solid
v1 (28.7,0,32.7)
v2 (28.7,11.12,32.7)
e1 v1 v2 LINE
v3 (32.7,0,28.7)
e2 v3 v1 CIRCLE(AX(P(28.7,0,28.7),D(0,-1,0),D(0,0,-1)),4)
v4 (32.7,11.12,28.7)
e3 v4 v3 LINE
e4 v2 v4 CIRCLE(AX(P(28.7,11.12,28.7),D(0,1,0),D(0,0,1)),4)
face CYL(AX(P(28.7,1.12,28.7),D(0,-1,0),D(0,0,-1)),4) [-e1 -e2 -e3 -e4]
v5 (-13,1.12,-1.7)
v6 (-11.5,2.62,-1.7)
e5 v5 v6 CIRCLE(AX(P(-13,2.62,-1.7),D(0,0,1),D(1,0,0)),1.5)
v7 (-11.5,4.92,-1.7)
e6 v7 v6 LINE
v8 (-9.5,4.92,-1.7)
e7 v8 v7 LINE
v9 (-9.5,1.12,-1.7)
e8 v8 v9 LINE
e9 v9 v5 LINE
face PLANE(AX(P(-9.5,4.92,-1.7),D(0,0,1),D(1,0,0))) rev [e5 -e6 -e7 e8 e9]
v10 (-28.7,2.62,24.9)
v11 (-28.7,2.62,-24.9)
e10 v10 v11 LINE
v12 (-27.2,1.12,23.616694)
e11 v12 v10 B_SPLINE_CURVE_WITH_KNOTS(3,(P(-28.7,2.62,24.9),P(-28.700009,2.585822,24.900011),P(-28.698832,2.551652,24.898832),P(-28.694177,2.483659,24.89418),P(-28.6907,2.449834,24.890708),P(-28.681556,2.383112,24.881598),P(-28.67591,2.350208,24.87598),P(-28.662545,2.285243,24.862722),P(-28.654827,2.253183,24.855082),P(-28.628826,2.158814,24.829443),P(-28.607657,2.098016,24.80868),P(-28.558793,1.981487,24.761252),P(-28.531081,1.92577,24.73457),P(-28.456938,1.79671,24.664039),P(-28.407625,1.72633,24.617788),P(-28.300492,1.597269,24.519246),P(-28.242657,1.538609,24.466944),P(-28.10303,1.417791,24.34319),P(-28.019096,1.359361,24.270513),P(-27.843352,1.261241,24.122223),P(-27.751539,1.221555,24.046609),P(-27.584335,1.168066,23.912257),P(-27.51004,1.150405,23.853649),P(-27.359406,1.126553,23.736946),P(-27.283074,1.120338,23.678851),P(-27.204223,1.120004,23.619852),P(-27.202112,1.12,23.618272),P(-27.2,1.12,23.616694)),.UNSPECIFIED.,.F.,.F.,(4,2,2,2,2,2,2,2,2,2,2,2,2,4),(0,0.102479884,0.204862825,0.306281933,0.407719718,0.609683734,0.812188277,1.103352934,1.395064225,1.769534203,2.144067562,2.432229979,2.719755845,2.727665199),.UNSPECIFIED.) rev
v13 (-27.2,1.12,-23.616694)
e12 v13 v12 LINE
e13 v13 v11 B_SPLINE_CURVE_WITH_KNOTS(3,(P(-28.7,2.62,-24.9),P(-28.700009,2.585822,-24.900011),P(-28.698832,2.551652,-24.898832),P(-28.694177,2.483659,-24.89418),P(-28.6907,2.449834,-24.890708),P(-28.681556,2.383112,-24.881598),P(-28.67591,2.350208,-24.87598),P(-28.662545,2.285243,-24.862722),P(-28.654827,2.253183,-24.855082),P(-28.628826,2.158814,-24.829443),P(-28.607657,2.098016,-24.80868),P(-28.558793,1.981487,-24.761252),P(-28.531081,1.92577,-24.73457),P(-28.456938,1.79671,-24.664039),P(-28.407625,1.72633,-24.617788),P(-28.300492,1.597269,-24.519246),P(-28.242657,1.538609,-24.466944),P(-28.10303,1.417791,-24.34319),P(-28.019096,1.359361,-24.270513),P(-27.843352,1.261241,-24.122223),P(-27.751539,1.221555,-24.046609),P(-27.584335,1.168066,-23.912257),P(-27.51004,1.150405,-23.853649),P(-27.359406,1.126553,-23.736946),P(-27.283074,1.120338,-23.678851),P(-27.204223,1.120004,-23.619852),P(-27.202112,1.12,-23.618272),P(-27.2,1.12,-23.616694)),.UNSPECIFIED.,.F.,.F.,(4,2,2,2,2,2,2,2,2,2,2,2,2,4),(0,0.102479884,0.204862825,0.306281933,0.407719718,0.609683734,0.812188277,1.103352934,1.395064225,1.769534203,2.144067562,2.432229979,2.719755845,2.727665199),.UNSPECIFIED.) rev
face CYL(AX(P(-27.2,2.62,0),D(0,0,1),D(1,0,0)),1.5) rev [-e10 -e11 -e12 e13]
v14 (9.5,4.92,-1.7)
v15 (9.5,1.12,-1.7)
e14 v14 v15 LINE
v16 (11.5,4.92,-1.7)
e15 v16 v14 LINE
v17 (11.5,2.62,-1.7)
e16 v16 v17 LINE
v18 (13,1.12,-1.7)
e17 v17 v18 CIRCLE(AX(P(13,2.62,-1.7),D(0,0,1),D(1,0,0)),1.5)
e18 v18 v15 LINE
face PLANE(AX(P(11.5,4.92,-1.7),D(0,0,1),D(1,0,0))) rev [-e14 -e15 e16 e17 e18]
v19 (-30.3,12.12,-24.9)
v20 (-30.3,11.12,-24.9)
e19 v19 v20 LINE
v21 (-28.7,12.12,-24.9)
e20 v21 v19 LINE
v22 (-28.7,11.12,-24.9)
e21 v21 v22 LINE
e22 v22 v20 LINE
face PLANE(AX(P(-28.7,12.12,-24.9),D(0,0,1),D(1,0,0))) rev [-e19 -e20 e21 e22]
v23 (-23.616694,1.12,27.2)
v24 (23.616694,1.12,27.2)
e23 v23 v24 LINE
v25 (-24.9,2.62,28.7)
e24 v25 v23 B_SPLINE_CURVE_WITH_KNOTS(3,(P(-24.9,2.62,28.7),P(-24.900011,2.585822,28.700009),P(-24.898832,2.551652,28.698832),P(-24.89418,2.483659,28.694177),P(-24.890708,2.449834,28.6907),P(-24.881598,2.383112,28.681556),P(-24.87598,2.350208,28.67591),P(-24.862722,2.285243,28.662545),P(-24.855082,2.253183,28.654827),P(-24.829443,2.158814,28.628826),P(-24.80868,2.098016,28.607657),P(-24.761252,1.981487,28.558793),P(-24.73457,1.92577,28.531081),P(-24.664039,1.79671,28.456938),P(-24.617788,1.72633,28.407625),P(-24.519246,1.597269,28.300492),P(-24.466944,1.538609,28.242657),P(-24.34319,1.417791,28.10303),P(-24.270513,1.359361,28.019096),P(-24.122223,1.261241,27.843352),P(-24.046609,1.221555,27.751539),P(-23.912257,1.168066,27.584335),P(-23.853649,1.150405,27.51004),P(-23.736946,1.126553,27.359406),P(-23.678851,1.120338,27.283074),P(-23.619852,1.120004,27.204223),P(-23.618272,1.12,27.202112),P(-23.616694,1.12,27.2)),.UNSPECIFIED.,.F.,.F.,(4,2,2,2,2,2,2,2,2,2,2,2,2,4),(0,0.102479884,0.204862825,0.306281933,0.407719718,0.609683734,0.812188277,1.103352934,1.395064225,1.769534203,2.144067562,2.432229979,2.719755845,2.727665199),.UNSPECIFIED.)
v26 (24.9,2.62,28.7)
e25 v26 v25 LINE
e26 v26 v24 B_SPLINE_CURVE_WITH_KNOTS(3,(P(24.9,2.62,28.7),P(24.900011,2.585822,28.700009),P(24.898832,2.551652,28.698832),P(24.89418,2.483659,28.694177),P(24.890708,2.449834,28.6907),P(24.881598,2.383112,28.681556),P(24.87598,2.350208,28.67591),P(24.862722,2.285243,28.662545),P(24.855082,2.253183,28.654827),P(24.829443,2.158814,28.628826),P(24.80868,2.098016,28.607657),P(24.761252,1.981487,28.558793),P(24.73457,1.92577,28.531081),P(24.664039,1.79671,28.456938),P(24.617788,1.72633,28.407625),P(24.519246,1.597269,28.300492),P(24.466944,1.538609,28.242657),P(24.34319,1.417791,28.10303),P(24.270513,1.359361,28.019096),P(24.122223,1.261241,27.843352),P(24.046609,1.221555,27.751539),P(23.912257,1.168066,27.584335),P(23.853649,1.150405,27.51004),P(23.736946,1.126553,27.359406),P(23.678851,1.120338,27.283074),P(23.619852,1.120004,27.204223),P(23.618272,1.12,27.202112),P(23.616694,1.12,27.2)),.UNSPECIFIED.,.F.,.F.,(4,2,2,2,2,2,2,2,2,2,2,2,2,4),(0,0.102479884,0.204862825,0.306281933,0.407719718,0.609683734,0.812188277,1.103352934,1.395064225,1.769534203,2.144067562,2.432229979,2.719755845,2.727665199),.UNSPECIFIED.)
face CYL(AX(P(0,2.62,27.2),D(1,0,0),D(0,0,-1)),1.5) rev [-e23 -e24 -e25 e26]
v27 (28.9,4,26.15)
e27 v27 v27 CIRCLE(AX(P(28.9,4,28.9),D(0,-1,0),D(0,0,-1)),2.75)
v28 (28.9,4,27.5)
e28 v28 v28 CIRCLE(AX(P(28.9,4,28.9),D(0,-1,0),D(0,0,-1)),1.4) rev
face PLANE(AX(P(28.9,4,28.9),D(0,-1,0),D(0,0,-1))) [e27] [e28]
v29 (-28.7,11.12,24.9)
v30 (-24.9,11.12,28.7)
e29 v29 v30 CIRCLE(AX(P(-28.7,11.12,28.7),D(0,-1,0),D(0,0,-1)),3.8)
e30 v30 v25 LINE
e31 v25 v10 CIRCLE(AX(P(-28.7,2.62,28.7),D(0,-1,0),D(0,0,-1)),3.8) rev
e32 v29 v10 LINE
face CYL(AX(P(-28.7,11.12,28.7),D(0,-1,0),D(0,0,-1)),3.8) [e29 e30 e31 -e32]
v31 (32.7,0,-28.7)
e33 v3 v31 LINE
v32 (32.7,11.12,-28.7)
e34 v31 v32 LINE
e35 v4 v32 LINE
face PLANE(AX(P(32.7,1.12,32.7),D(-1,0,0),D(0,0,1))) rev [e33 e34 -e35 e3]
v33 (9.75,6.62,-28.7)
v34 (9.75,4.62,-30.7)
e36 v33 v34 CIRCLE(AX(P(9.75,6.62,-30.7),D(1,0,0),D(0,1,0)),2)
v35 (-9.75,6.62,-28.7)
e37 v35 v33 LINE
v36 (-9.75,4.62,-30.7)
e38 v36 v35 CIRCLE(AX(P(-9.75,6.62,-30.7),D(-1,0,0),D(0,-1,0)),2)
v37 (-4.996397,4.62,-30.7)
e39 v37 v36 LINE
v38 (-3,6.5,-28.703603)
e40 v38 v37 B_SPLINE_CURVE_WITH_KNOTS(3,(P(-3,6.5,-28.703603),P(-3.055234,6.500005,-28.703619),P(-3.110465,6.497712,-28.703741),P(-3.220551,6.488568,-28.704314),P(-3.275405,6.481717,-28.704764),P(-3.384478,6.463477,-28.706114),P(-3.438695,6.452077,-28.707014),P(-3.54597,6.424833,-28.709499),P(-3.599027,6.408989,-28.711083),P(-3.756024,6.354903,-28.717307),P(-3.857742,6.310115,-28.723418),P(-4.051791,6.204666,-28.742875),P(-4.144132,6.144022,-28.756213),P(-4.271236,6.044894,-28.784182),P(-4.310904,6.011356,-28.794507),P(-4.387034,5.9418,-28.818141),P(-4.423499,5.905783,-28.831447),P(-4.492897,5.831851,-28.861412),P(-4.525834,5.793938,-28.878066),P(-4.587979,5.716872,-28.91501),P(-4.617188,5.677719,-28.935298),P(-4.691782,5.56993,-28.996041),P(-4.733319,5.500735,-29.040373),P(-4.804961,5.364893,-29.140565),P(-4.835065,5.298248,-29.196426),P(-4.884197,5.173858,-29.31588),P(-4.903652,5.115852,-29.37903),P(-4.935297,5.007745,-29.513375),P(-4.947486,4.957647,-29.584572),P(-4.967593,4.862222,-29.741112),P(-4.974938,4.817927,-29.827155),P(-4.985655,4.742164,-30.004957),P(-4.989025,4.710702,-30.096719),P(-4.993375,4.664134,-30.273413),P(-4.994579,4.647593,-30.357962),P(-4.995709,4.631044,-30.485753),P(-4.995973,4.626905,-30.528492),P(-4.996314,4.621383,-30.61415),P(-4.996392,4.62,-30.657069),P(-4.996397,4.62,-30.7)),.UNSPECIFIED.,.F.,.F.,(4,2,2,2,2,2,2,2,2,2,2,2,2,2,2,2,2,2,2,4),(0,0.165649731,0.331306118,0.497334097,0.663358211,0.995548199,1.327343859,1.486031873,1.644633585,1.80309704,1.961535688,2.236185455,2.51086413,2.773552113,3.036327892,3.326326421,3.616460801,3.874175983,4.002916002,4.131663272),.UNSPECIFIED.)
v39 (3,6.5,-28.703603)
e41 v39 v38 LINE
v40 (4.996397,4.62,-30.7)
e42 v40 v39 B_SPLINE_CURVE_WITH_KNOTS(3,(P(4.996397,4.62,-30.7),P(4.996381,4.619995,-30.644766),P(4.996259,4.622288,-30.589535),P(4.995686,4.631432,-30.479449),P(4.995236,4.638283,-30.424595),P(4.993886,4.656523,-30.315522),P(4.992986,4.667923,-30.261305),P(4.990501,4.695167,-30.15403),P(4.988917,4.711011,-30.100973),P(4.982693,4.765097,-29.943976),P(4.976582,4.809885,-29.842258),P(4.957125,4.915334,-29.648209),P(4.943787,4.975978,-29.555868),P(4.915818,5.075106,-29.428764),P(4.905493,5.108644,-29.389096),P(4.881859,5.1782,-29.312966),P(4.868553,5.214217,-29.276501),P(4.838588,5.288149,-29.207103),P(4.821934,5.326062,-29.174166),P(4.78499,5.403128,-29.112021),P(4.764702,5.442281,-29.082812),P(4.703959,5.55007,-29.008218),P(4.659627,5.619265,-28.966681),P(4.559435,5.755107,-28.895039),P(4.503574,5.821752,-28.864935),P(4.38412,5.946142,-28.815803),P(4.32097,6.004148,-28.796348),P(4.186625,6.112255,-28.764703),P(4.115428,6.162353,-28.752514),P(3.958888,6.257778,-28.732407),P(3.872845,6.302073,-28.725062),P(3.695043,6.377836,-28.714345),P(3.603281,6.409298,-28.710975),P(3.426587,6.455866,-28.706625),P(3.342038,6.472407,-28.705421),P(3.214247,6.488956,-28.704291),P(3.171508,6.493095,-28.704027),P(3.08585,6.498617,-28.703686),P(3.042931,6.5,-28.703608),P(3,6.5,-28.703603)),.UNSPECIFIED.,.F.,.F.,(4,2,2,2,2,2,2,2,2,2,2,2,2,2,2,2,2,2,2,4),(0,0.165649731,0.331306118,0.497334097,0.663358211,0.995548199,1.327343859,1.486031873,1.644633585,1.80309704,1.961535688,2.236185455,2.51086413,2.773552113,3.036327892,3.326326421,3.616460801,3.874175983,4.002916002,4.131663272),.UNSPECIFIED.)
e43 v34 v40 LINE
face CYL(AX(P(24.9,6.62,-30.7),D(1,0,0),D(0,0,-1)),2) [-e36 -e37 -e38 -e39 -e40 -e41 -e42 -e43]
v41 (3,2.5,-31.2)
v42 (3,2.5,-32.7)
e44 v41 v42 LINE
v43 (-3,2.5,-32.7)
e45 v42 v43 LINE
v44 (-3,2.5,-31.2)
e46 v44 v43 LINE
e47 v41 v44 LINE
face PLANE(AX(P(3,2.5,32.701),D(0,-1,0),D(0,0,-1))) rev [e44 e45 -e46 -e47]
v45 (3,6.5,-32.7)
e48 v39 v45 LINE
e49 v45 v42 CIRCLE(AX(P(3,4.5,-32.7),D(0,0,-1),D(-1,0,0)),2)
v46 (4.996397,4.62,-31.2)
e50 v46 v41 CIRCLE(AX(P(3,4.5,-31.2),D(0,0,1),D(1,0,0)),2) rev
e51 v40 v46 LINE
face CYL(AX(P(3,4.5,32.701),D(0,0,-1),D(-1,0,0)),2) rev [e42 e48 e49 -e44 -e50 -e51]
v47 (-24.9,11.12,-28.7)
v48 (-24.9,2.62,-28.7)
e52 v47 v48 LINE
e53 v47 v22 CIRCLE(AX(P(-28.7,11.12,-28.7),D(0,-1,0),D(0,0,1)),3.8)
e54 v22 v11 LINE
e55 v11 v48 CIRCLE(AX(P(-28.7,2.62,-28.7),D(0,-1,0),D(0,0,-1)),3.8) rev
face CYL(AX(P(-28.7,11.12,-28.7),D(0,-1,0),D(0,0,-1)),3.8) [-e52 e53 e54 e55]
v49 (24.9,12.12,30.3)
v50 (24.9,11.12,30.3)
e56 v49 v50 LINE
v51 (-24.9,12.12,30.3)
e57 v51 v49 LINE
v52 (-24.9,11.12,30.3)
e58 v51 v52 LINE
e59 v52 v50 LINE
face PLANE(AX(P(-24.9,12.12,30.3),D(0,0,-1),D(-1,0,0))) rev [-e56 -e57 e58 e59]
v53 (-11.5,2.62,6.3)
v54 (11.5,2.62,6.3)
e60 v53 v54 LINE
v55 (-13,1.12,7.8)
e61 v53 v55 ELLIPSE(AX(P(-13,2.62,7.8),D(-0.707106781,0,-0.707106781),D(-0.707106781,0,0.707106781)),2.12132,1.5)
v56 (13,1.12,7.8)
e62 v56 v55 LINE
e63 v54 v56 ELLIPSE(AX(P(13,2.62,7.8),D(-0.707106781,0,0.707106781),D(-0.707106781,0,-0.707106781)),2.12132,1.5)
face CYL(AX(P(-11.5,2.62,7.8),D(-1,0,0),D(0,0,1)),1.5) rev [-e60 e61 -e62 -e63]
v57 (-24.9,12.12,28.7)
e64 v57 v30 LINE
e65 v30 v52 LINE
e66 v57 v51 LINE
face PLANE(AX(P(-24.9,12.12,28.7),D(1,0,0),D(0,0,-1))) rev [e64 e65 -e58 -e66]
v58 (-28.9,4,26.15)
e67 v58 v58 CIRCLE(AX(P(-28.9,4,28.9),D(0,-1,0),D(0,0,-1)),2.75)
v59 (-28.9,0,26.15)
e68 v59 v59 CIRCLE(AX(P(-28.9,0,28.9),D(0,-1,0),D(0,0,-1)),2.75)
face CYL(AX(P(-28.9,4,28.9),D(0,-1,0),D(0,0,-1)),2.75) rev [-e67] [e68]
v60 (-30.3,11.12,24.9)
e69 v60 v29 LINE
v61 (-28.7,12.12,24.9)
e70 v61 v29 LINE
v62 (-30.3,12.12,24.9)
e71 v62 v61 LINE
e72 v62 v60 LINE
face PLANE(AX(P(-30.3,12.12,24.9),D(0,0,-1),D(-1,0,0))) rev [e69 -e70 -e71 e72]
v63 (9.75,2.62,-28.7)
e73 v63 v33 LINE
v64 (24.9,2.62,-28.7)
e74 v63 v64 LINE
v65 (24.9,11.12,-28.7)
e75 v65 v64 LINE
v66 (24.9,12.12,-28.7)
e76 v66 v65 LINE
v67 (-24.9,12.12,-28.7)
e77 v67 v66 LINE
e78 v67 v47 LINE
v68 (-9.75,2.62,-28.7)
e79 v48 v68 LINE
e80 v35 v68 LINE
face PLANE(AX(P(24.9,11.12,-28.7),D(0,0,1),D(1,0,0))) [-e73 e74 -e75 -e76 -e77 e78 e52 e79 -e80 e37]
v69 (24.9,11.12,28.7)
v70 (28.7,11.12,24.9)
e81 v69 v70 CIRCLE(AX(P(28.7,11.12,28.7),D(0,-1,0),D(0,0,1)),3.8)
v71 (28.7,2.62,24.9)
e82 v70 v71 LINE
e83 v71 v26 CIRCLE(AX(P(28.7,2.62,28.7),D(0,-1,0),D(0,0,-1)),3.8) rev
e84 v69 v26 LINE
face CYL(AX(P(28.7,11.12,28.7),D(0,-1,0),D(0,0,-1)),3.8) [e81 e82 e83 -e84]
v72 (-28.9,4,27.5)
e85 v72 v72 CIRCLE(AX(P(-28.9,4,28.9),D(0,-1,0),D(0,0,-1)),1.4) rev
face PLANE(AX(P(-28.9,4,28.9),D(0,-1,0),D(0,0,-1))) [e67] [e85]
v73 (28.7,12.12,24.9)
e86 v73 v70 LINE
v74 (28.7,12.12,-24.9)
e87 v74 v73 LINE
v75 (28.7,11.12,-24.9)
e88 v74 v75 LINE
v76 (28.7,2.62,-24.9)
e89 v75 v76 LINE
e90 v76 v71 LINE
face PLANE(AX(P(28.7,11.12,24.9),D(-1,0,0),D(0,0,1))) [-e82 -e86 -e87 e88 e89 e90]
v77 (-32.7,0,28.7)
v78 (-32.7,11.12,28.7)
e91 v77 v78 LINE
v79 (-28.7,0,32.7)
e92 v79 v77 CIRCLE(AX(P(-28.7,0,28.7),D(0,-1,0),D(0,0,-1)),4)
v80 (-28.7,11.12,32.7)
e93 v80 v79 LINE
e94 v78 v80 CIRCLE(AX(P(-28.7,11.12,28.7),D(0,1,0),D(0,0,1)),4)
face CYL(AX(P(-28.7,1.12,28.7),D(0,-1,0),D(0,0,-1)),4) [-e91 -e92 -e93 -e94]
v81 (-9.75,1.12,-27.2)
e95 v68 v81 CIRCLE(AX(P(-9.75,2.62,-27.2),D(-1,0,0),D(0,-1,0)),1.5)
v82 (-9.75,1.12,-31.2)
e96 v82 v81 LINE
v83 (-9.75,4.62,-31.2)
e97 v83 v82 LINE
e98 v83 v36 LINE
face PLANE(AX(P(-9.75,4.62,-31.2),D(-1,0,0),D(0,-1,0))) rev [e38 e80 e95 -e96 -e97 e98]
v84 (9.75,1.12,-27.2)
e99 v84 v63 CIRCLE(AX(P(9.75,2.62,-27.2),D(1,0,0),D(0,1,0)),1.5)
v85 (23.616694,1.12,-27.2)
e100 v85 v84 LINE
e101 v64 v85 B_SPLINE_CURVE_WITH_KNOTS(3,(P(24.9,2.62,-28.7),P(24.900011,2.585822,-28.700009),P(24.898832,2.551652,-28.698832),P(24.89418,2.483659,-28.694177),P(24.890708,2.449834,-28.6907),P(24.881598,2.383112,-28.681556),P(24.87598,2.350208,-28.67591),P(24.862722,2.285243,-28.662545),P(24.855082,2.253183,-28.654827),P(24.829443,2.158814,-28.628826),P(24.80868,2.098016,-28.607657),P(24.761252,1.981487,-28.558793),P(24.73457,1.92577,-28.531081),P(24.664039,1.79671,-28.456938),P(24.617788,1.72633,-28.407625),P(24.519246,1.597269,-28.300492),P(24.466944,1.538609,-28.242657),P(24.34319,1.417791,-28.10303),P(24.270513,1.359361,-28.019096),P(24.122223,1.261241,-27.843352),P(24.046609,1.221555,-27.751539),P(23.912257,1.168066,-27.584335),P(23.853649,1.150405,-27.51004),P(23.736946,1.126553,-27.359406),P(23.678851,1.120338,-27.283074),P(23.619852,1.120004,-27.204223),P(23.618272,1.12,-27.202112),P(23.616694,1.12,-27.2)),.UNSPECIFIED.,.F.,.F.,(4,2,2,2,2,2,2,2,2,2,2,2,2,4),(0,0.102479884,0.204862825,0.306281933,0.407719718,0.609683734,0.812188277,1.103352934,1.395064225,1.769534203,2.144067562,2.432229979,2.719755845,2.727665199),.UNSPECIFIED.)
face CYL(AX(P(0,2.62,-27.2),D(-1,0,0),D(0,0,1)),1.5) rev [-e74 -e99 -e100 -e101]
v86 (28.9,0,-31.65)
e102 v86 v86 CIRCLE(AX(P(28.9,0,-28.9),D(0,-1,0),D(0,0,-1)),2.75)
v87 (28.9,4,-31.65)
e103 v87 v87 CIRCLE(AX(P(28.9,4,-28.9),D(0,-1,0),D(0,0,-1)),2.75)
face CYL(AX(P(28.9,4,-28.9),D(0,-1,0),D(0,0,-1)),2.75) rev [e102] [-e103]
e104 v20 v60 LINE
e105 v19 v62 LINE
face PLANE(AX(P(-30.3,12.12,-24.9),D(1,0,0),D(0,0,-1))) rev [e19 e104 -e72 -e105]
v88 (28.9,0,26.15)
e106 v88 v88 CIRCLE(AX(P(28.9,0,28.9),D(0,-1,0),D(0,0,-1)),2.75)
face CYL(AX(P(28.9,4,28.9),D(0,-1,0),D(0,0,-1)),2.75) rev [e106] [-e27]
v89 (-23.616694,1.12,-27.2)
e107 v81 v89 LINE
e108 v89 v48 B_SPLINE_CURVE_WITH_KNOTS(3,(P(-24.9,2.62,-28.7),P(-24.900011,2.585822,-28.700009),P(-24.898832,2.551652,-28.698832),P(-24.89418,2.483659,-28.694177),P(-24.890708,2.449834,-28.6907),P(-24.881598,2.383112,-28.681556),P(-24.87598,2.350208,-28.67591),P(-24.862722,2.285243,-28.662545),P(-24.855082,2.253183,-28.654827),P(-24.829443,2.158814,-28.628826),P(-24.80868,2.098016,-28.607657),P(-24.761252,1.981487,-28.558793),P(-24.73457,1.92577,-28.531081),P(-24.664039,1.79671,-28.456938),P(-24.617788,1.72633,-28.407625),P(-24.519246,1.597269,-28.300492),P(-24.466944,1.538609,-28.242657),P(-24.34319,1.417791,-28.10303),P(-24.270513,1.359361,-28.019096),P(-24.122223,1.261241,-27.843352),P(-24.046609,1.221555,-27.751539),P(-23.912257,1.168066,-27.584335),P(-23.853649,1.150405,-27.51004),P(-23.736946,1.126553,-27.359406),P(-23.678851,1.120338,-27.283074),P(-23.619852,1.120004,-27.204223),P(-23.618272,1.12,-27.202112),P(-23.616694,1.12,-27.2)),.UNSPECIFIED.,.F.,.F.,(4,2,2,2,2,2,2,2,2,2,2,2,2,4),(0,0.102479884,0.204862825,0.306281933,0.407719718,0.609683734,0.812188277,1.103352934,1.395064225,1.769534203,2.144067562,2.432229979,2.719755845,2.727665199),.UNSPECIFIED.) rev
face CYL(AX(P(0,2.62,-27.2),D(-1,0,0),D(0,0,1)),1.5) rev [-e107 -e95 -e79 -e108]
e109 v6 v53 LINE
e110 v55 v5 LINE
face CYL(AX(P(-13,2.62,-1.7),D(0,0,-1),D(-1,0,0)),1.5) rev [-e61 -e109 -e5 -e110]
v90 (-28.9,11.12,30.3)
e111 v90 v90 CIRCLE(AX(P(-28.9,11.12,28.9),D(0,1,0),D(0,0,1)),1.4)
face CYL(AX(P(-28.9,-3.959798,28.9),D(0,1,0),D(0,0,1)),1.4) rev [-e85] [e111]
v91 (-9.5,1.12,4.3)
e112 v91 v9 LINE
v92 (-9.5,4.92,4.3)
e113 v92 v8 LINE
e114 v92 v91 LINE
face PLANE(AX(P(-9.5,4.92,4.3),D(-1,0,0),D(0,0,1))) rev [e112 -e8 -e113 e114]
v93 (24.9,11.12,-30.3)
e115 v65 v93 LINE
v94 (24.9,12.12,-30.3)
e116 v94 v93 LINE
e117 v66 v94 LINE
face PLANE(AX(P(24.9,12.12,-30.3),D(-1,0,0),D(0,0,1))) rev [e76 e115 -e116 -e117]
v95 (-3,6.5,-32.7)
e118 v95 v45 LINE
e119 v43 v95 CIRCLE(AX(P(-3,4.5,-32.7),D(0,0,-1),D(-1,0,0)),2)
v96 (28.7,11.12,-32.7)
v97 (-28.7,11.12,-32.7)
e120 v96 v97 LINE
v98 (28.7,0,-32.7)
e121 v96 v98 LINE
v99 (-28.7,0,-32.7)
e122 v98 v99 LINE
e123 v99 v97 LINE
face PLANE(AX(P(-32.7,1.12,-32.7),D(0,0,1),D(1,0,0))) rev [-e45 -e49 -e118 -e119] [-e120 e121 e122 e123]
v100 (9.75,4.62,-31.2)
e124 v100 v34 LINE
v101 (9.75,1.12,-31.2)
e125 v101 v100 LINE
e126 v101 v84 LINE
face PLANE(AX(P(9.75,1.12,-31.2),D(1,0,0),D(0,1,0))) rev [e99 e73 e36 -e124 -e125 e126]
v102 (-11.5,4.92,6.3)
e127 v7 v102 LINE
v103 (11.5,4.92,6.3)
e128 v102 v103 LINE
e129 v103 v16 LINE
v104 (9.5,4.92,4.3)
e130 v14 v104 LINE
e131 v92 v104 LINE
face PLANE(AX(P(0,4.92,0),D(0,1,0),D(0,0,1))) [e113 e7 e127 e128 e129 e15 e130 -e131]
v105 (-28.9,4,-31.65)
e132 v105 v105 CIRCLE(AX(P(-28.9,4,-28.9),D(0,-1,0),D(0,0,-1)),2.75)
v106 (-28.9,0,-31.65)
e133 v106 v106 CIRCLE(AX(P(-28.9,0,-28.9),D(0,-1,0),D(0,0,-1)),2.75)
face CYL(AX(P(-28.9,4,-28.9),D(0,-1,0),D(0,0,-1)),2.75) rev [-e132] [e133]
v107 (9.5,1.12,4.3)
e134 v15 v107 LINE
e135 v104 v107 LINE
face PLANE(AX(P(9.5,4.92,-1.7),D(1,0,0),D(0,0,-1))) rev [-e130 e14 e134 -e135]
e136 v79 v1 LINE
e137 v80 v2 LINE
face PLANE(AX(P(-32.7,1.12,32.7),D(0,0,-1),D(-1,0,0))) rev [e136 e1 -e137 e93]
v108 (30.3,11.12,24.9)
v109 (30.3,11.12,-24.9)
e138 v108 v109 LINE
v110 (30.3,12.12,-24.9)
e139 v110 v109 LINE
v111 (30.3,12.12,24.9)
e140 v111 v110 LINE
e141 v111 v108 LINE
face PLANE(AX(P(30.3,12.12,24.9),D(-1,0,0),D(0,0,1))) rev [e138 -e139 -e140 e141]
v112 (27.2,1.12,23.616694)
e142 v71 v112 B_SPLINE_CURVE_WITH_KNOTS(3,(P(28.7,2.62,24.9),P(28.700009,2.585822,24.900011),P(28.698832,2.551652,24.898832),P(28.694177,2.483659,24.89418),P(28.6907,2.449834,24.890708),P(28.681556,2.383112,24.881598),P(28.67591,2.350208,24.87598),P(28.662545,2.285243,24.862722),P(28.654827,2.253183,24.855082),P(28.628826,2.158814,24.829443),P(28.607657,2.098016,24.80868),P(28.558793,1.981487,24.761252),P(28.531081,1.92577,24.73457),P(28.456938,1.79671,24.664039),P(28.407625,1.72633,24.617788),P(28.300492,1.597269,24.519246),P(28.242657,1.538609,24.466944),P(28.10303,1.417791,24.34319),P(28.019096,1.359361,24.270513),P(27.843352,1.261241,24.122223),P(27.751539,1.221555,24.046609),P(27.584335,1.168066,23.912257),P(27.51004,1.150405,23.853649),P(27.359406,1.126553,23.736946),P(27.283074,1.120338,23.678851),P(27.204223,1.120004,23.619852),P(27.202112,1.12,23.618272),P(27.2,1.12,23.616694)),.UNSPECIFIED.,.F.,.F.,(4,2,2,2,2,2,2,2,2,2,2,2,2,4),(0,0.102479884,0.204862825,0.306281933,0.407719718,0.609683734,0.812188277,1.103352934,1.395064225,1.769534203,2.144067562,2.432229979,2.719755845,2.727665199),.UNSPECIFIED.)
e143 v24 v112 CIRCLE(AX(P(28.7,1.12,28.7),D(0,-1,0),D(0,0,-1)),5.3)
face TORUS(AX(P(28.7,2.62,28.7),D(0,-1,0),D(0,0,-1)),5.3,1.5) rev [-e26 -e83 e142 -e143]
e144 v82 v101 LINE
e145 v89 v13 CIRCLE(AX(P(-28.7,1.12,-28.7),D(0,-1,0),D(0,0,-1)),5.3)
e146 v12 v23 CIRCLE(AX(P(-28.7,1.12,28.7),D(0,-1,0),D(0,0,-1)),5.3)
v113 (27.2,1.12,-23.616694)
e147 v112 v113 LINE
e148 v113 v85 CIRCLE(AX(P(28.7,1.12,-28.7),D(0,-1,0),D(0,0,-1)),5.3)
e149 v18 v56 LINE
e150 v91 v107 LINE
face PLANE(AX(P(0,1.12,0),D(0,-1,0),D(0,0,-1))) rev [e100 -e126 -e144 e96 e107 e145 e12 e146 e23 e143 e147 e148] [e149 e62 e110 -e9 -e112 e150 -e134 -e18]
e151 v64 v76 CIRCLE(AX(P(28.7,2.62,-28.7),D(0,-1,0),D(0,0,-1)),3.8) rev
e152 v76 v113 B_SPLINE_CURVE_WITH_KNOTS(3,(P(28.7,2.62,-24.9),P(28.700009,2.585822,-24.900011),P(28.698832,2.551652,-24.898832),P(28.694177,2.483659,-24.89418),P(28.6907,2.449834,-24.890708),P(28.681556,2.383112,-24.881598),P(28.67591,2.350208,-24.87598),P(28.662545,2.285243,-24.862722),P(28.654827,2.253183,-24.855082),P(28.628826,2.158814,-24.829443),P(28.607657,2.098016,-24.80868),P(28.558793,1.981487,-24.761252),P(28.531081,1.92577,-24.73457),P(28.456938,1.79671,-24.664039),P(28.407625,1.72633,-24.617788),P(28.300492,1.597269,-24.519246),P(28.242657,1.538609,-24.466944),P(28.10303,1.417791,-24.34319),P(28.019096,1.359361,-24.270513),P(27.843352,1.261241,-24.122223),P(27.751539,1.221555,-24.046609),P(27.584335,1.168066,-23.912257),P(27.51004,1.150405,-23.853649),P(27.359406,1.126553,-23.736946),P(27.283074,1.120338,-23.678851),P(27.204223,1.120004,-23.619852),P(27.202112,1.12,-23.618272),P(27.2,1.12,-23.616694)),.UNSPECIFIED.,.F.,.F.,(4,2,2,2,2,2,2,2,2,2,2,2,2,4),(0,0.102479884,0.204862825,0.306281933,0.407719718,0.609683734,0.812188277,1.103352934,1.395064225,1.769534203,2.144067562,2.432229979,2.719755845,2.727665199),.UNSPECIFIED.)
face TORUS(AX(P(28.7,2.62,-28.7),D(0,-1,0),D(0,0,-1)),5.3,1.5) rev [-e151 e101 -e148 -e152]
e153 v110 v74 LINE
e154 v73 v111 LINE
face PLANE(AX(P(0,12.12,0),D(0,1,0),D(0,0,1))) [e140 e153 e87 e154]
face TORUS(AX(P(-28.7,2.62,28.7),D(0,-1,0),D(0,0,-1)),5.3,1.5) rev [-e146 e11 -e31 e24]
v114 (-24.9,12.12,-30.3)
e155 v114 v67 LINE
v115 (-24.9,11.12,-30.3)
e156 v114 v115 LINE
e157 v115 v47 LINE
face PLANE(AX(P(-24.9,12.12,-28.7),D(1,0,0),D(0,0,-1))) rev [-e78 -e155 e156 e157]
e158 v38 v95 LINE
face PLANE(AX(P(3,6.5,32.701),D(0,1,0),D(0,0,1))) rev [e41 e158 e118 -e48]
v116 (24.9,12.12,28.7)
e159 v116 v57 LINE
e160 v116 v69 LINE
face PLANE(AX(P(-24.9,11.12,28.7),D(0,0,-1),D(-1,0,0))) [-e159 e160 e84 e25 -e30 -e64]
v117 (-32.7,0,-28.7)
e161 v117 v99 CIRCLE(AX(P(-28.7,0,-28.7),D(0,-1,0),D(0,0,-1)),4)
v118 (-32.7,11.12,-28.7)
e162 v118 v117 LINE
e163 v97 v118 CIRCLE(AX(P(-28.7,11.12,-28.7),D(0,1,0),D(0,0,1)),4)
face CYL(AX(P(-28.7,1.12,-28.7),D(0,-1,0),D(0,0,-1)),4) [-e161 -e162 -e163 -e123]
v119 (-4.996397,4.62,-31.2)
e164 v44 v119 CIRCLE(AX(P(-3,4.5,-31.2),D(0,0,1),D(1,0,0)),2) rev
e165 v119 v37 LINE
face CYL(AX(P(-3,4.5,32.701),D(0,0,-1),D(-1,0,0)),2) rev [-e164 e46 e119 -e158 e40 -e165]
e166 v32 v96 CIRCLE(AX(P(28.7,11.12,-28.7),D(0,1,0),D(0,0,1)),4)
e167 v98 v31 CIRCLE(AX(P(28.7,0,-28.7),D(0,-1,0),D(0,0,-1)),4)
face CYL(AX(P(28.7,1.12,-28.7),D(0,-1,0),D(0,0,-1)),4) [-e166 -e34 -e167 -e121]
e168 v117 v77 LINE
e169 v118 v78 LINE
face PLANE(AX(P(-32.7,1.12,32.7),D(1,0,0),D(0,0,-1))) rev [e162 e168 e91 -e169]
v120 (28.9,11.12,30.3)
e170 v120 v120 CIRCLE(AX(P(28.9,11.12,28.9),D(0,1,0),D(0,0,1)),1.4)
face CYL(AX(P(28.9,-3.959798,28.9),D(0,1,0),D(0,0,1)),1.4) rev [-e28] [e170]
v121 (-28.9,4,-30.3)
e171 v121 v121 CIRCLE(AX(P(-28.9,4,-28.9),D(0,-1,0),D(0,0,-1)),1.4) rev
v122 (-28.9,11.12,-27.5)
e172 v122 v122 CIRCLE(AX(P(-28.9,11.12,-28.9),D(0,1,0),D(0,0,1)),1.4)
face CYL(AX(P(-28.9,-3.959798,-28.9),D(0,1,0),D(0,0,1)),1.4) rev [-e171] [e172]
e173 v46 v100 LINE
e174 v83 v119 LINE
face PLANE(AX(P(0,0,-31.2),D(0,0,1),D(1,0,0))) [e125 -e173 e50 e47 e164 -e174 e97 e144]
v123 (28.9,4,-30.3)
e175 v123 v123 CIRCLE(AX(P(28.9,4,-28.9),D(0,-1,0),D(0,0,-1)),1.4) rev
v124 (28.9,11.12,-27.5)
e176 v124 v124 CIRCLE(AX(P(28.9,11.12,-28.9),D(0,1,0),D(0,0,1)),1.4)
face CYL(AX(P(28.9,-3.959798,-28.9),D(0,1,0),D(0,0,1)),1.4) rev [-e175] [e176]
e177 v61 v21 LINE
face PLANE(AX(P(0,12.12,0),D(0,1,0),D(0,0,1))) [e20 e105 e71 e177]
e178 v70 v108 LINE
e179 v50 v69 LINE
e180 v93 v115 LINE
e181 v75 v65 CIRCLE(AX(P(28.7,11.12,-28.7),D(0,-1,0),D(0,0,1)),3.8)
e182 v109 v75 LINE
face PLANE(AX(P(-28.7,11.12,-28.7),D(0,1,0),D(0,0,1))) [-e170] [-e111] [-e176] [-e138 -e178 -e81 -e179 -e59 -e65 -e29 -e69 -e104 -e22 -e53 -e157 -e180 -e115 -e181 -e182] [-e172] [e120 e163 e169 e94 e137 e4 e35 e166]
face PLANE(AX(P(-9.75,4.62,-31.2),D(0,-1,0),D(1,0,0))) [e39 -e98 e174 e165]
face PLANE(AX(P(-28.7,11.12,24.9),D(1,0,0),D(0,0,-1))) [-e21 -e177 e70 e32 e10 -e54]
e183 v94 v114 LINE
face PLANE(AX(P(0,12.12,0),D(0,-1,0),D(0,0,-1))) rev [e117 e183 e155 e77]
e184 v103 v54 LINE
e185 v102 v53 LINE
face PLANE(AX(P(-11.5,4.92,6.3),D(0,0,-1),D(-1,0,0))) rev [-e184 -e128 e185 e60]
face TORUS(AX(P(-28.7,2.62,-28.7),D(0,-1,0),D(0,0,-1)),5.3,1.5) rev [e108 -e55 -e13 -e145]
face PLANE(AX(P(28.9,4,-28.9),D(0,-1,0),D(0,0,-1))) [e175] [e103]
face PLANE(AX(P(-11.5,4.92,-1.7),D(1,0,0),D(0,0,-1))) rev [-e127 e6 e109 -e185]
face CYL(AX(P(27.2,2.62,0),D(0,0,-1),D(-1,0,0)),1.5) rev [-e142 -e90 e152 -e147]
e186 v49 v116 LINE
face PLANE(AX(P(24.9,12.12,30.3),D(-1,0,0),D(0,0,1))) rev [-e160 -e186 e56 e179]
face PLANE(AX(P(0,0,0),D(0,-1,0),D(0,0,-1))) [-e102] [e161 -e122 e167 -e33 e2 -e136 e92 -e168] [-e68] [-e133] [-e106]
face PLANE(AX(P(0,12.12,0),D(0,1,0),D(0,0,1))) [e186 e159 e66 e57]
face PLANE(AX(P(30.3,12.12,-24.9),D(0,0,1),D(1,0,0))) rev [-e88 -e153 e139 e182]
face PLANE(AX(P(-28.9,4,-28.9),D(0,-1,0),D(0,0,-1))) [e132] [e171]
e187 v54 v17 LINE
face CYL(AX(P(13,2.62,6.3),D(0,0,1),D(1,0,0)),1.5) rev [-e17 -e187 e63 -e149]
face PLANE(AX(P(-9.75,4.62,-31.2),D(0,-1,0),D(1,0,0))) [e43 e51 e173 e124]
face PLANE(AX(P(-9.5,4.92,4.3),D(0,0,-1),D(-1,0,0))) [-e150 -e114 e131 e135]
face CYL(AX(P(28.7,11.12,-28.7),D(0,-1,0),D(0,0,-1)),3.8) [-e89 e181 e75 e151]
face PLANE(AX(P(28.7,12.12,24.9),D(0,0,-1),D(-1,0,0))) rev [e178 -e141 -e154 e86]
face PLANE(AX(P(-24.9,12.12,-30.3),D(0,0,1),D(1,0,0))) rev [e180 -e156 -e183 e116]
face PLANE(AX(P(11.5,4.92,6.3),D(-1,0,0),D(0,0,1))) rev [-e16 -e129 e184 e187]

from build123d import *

# Parameters (mm, degrees)
SKETCH1_W           = 65.4
SKETCH1_H           = 65.4
BOSS_EXTRUDE1_DEPTH = 1.12
FILLET1_R           = 4
BOSS_EXTRUDE2_START = 10
BOSS_EXTRUDE2_DEPTH = 10
CUT_EXTRUDE1_REACH  = 75.96
SKETCH4_W           = 19.5
SKETCH4_H           = 3.5
CUT_EXTRUDE2_DEPTH  = 2.5
FILLET3_R           = 2
SKETCH5_W           = 1.6
SKETCH5_H           = 49.8
SKETCH5_W_2         = 49.8
SKETCH5_H_2         = 1.6
BOSS_EXTRUDE3_DEPTH = 1
BOSS_EXTRUDE4_DEPTH = 3.8
SKETCH7_R           = 1.4
CUT_EXTRUDE3_DEPTH  = 11.12
SKETCH8_R           = 2.75
CUT_EXTRUDE4_DEPTH  = 4
FILLET4_R           = 1.5
FILLET5_R           = 1.5


with BuildPart() as part:
    # Sketch1 → Boss-Extrude1 (new body)
    with BuildSketch(Plane(origin=(0, 0, 0), x_dir=(1, 0, 0), z_dir=(0, 1, 0))):
        Rectangle(SKETCH1_W, SKETCH1_H)
    extrude(amount=BOSS_EXTRUDE1_DEPTH)

    # Fillet1
    fillet1_edges = [part.edges().sort_by_distance(p)[0] for p in [
        (32.7, 0.56, 32.7),
        (-32.7, 0.56, 32.7),
        (-32.7, 0.56, -32.7),
        (32.7, 0.56, -32.7),
    ]]
    fillet(fillet1_edges, radius=FILLET1_R)

    # Sketch2 → Boss-Extrude2 (add)
    with BuildSketch(Plane(origin=(0, 1.12, 0), x_dir=(1, 0, 0), z_dir=(0, 1, 0)).offset(BOSS_EXTRUDE2_START)):
        with BuildLine():
            Line((-32.7, 28.7), (-32.7, -28.7))
            ThreePointArc((-32.7, -28.7), (-31.528427125, -31.528427125), (-28.7, -32.7))
            Line((-28.7, -32.7), (28.7, -32.7))
            ThreePointArc((28.7, -32.7), (31.528427125, -31.528427125), (32.7, -28.7))
            Line((32.7, -28.7), (32.7, 28.7))
            ThreePointArc((32.7, 28.7), (31.528427125, 31.528427125), (28.7, 32.7))
            Line((28.7, 32.7), (-28.7, 32.7))
            ThreePointArc((-28.7, 32.7), (-31.528427125, 31.528427125), (-32.7, 28.7))
        make_face()
        with BuildLine():
            Line((24.9, 28.7), (-24.9, 28.7))
            ThreePointArc((-24.9, 28.7), (-26.012994231, 26.012994231), (-28.7, 24.9))
            Line((-28.7, 24.9), (-28.7, -24.9))
            ThreePointArc((-28.7, -24.9), (-26.012994231, -26.012994231), (-24.9, -28.7))
            Line((-24.9, -28.7), (24.9, -28.7))
            ThreePointArc((24.9, -28.7), (26.012994231, -26.012994231), (28.7, -24.9))
            Line((28.7, -24.9), (28.7, 24.9))
            ThreePointArc((28.7, 24.9), (26.012994231, 26.012994231), (24.9, 28.7))
        make_face(mode=Mode.SUBTRACT)
    extrude(amount=-BOSS_EXTRUDE2_DEPTH)

    # Sketch3 → Cut-Extrude1 (cut, up to next)
    with BuildSketch(Plane(origin=(0, 0, -32.7), x_dir=(-1, 0, 0), z_dir=(0, 0, -1)), mode=Mode.PRIVATE) as cut_extrude1_sk1:
        with BuildLine():
            Line((-3, 6.5), (3, 6.5))
            ThreePointArc((3, 6.5), (5, 4.5), (3, 2.5))
            Line((3, 2.5), (-3, 2.5))
            ThreePointArc((-3, 2.5), (-5, 4.5), (-3, 6.5))
        make_face()
    cut_extrude1_tool1 = extrude(cut_extrude1_sk1.sketch, amount=-CUT_EXTRUDE1_REACH, mode=Mode.PRIVATE) & part.part
    add(cut_extrude1_tool1.solids().sort_by_distance((0, 4.5, -32.7))[0], mode=Mode.SUBTRACT)

    # Sketch4 → Cut-Extrude2 (cut)
    with BuildSketch(Plane.XY.offset(-28.7)):
        with Locations((0, 2.87)):
            Rectangle(SKETCH4_W, SKETCH4_H)
    extrude(amount=-CUT_EXTRUDE2_DEPTH, mode=Mode.SUBTRACT)

    # Fillet3
    # the kernel refuses this fillet: 2 mm, written as the material it takes off along each edge
    with BuildSketch(Plane(origin=(-0.003603246, 4.62, -28.7), x_dir=(0, 1, 0), z_dir=(1, 0, 0)), Plane(origin=(-9.75, 4.62, -28.7), x_dir=(0, 1, 0), z_dir=(1, 0, 0))) as fillet3_piece_1:
        with BuildLine():
            CenterArc((FILLET3_R, -FILLET3_R), FILLET3_R, 90, 90)
            Line((0, -FILLET3_R), (0, 0))
            Line((0, 0), (FILLET3_R, 0))
        make_face()
    extrude(amount=9.753603246, mode=Mode.SUBTRACT)

    # Sketch5 → Boss-Extrude3 (add)
    with BuildSketch(Plane(origin=(0, 11.12, 0), x_dir=(1, 0, 0), z_dir=(0, 1, 0))):
        with Locations((-29.5, 0)):
            Rectangle(SKETCH5_W, SKETCH5_H)
        with Locations((0, -29.5)):
            Rectangle(SKETCH5_W_2, SKETCH5_H_2)
        with Locations((29.5, 0)):
            Rectangle(SKETCH5_W, SKETCH5_H)
        with Locations((0, 29.5)):
            Rectangle(SKETCH5_W_2, SKETCH5_H_2)
    extrude(amount=BOSS_EXTRUDE3_DEPTH)

    # Sketch6 → Boss-Extrude4 (add)
    with BuildSketch(Plane(origin=(0, 1.12, 0), x_dir=(1, 0, 0), z_dir=(0, 1, 0))):
        Polygon((-9.5, -4.3), (9.5, -4.3), (9.5, 1.7), (11.5, 1.7), (11.5, -6.3), (-11.5, -6.3), (-11.5, 1.7), (-9.5, 1.7), align=None)
    extrude(amount=BOSS_EXTRUDE4_DEPTH)

    # Sketch7 → Cut-Extrude3 (cut)
    with BuildSketch(Plane(origin=(0, 11.12, 0), x_dir=(1, 0, 0), z_dir=(0, 1, 0))):
        with Locations(Location((-28.9, 28.9, 0), (0, 0, 270))):
            Circle(SKETCH7_R)
        with Locations(Location((28.9, 28.9, 0), (0, 0, 270))):
            Circle(SKETCH7_R)
        with Locations(Location((28.9, -28.9, 0), (0, 0, 270))):
            Circle(SKETCH7_R)
        with Locations(Location((-28.9, -28.9, 0), (0, 0, 270))):
            Circle(SKETCH7_R)
    extrude(amount=-CUT_EXTRUDE3_DEPTH, mode=Mode.SUBTRACT)

    # Sketch8 → Cut-Extrude4 (cut)
    with BuildSketch(Plane.XZ):
        with Locations(Location((-28.9, 28.9, 0), (0, 0, 270))):
            Circle(SKETCH8_R)
        with Locations(Location((28.9, 28.9, 0), (0, 0, 270))):
            Circle(SKETCH8_R)
        with Locations(Location((28.9, -28.9, 0), (0, 0, 270))):
            Circle(SKETCH8_R)
        with Locations(Location((-28.9, -28.9, 0), (0, 0, 270))):
            Circle(SKETCH8_R)
    extrude(amount=-CUT_EXTRUDE4_DEPTH, mode=Mode.SUBTRACT)

    # Fillet4
    fillet4_edges = [part.edges().sort_by_distance(p)[0] for p in [
        (-11.5, 1.12, 2.3),
        (0, 1.12, 6.3),
        (11.5, 1.12, 2.3),
    ]]
    fillet(fillet4_edges, radius=FILLET4_R)

    # Fillet5
    fillet5_edges = [part.edges().sort_by_distance(p)[0] for p in [
        (-17.325, 1.12, -28.7),
        (26.012994231, 1.12, -26.012994231),
        (17.325, 1.12, -28.7),
        (-26.012994231, 1.12, -26.012994231),
        (-28.7, 1.12, 0),
        (-26.012994231, 1.12, 26.012994231),
        (0, 1.12, 28.7),
        (26.012994231, 1.12, 26.012994231),
        (28.7, 1.12, 0),
    ]]
    fillet(fillet5_edges, radius=FILLET5_R)


solid = part.part
